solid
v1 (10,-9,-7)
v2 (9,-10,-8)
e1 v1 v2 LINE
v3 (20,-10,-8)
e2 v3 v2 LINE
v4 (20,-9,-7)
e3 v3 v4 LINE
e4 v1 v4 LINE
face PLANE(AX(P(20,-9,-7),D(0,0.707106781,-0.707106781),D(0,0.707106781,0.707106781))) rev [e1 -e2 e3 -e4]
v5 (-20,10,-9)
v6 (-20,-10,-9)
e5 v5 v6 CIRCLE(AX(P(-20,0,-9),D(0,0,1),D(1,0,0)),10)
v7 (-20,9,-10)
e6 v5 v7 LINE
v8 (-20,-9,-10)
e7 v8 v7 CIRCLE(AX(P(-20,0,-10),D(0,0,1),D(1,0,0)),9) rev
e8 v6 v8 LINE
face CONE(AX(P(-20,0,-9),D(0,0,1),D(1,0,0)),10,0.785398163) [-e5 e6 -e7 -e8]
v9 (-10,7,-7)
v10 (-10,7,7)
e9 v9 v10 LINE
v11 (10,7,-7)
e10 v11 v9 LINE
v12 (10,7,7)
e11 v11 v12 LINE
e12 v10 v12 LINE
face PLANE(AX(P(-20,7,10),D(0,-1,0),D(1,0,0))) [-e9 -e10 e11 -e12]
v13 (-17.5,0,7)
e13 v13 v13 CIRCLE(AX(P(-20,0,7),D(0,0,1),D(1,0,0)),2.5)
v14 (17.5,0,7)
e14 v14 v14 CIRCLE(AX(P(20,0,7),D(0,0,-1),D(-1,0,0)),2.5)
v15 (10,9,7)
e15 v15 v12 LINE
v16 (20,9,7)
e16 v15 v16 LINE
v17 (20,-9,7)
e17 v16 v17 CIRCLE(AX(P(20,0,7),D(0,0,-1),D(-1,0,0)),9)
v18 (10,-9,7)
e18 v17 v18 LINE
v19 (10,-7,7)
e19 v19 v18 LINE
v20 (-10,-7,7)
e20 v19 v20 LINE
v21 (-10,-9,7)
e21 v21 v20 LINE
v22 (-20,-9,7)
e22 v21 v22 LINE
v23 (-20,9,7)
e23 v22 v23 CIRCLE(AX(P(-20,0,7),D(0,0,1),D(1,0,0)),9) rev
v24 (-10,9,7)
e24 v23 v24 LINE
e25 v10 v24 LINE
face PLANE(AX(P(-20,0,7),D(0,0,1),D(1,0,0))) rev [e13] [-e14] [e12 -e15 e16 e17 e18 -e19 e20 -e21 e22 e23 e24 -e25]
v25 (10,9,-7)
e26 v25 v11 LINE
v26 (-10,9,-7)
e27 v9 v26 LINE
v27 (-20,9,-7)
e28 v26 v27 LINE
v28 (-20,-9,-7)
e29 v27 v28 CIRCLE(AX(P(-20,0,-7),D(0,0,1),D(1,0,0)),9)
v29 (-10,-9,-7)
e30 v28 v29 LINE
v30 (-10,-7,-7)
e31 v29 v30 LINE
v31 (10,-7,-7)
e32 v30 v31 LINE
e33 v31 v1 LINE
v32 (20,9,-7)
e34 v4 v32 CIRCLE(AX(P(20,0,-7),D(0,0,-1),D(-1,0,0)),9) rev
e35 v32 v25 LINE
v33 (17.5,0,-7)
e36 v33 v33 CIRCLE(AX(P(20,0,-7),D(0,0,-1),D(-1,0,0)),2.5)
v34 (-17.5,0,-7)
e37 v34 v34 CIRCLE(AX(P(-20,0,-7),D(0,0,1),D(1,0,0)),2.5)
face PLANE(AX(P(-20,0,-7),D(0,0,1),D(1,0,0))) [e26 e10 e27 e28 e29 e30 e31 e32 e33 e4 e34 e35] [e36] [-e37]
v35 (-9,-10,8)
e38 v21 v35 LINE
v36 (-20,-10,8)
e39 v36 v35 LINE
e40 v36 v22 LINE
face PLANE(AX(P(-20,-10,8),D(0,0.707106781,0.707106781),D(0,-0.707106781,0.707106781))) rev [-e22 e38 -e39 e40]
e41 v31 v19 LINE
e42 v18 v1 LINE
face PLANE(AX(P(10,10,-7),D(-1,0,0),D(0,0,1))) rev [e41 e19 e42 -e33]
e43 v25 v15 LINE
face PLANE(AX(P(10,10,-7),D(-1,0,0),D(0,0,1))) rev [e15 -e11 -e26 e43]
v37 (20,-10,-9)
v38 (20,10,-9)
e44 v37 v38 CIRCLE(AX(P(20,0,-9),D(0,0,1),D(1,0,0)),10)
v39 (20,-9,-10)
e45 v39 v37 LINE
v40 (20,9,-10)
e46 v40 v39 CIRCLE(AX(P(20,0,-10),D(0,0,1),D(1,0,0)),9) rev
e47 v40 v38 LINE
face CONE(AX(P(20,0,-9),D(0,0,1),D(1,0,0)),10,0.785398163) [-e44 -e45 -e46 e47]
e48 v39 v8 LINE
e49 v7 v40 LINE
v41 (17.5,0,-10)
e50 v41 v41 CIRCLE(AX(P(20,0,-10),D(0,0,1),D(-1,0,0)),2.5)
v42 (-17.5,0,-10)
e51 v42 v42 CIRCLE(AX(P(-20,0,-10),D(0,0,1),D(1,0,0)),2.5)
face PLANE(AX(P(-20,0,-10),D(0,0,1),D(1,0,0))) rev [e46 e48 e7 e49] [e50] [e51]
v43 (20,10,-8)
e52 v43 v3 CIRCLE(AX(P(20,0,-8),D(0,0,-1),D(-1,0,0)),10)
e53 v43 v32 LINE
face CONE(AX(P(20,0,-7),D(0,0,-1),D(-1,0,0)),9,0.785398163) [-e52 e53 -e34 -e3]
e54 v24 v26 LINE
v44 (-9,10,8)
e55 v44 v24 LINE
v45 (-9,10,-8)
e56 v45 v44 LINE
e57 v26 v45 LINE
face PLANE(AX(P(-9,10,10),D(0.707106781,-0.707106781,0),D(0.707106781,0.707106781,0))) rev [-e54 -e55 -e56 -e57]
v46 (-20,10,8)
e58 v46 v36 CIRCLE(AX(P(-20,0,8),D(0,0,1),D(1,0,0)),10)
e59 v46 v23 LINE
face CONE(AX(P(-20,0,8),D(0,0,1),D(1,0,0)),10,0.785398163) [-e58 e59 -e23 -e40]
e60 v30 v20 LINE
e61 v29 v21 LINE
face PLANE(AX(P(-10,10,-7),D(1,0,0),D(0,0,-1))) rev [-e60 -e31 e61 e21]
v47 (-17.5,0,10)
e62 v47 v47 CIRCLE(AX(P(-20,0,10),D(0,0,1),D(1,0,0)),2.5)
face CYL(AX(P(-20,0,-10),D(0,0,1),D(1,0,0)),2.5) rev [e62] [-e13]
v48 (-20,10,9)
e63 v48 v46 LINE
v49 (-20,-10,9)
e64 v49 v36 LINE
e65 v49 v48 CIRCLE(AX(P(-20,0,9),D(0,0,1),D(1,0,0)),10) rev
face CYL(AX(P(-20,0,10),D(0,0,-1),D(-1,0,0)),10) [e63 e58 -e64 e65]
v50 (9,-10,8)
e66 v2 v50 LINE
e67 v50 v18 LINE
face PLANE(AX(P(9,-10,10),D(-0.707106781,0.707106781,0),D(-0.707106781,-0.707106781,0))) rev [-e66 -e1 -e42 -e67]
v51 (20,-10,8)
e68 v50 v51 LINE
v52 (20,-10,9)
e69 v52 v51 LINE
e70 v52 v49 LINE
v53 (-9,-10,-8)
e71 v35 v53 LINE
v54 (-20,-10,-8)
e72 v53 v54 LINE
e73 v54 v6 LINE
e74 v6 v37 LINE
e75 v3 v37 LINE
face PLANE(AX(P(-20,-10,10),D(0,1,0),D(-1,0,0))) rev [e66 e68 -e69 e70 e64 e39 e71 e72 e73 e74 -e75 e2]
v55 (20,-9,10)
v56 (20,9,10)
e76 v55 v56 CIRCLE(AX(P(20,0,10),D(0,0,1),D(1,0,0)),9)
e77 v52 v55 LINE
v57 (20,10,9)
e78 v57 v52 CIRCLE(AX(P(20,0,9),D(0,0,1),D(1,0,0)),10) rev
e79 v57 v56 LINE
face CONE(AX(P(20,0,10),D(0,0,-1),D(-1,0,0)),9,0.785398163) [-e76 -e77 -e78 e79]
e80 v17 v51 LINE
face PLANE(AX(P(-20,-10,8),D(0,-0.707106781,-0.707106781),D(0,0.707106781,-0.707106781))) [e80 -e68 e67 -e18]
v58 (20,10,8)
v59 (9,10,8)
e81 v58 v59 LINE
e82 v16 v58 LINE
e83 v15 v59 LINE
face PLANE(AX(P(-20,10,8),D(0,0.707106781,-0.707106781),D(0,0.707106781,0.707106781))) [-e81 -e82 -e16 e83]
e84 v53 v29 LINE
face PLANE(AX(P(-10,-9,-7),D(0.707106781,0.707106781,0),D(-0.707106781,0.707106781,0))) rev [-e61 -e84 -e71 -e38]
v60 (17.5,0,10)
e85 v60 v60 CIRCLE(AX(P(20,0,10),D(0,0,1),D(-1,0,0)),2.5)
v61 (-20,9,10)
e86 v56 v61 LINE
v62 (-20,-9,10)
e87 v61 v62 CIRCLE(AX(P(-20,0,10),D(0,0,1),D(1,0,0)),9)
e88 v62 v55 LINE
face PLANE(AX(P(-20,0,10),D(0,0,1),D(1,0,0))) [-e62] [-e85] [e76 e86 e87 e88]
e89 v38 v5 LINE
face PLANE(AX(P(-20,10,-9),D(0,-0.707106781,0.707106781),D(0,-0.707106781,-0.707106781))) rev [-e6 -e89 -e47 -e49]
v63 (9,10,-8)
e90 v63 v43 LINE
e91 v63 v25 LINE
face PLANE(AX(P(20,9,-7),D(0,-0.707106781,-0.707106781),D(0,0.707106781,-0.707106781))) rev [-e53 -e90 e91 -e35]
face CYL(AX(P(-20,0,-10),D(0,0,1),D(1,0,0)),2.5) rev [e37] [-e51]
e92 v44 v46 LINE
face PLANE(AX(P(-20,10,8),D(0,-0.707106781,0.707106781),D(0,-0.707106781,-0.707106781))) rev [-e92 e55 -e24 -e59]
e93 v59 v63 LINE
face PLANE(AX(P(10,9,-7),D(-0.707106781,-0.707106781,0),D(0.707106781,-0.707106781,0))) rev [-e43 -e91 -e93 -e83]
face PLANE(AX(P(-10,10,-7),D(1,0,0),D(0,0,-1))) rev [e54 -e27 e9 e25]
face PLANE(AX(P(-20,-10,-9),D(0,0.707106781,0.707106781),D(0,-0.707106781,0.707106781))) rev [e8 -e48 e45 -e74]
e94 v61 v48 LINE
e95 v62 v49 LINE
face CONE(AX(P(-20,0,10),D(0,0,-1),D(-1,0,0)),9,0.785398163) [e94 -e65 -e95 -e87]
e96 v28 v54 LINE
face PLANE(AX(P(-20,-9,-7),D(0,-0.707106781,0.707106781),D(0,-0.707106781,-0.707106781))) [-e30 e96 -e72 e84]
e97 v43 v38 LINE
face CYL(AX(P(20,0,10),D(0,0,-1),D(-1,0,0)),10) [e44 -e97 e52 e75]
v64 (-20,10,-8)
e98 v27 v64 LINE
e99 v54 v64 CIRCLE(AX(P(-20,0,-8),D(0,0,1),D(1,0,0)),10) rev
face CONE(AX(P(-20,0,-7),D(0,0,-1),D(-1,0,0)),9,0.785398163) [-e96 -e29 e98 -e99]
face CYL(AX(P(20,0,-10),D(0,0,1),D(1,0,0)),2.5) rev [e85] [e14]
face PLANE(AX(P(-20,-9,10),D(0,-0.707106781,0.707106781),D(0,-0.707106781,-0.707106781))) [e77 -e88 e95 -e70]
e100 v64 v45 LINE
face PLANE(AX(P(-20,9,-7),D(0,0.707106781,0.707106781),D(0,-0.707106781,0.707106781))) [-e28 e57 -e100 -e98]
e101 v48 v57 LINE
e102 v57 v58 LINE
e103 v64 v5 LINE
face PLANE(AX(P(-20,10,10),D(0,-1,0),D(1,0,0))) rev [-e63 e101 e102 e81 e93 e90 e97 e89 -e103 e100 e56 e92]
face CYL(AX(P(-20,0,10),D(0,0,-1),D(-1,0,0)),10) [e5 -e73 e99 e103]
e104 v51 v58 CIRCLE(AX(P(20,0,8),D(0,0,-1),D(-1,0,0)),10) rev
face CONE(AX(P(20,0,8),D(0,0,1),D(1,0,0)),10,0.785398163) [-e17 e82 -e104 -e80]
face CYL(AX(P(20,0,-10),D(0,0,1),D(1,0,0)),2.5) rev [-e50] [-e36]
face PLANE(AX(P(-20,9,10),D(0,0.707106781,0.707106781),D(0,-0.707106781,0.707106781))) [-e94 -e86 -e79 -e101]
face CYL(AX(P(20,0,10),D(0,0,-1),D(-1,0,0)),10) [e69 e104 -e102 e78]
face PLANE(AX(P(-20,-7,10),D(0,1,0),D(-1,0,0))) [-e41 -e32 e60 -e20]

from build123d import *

# Parameters (mm, degrees)
BOSS_EXTRUDE1_DEPTH = 10
CUT_EXTRUDE1_DEPTH  = 7
SKETCH3_R           = 2.5
CUT_EXTRUDE2_DEPTH  = 10
CHAMFER2_SIZE       = 1
CHAMFER3_SIZE       = 1
SHELL1_START        = -7
SHELL1_OUTLINE_W    = 20
SHELL1_OUTLINE_H    = 14
SHELL1_DEPTH        = 14
CHAMFER4_SIZE       = 1


# Read off the part's stored shape, not the designer's step: Shell1
with BuildPart() as part:
    # Sketch1 → Boss-Extrude1 (new, symmetric)
    with BuildSketch(Plane.XY):
        with BuildLine():
            Line((-20, 10), (20, 10))
            ThreePointArc((20, 10), (30, 0), (20, -10))
            Line((20, -10), (-20, -10))
            ThreePointArc((-20, -10), (-30, 0), (-20, 10))
        make_face()
    extrude(amount=BOSS_EXTRUDE1_DEPTH, both=True)

    # Sketch2 → Cut-Extrude1 (cut, symmetric)
    with BuildSketch(Plane.XY):
        with BuildLine():
            Line((-20, 10), (-10, 10))
            Line((-10, 10), (-10, -10))
            Line((-10, -10), (-20, -10))
            ThreePointArc((-20, -10), (-30, 0), (-20, 10))
        make_face()
        with BuildLine():
            Line((10, -10), (20, -10))
            ThreePointArc((20, -10), (30, 0), (20, 10))
            Line((20, 10), (10, 10))
            Line((10, 10), (10, -10))
        make_face()
    extrude(amount=CUT_EXTRUDE1_DEPTH, both=True, mode=Mode.SUBTRACT)

    # Sketch3 → Cut-Extrude2 (cut, symmetric)
    with BuildSketch(Plane.XY):
        with Locations((-20, 0)):
            Circle(SKETCH3_R)
        with Locations(Location((20, 0, 0), (0, 0, 180))):
            Circle(SKETCH3_R)
    extrude(amount=CUT_EXTRUDE2_DEPTH, both=True, mode=Mode.SUBTRACT)

    # Chamfer2
    chamfer2_edges = [part.edges().sort_by_distance(p)[0] for p in [
        (-30, 0, -7),
        (-15, 10, -7),
        (-15, -10, -7),
        (-30, 0, 7),
        (-15, -10, 7),
        (-15, 10, 7),
        (30, 0, -7),
        (15, -10, -7),
        (15, 10, -7),
        (30, 0, 7),
        (15, 10, 7),
        (15, -10, 7),
    ]]
    chamfer(chamfer2_edges, length=CHAMFER2_SIZE)

    # Chamfer3
    chamfer3_edges = [part.edges().sort_by_distance(p)[0] for p in [
        (30, 0, 10),
        (0, 10, 10),
        (-30, 0, 10),
        (0, 10, -10),
        (30, 0, -10),
        (0, -10, -10),
        (-30, 0, -10),
        (0, -10, 10),
    ]]
    chamfer(chamfer3_edges, length=CHAMFER3_SIZE)

    # Shell1 outline → Shell1 (cut)
    with BuildSketch(Plane.XY.offset(SHELL1_START)):
        Rectangle(SHELL1_OUTLINE_W, SHELL1_OUTLINE_H)
    extrude(amount=SHELL1_DEPTH, mode=Mode.SUBTRACT)

    # Chamfer4
    chamfer4_edges = [part.edges().sort_by_distance(p)[0] for p in [
        (10, -10, 0),
        (10, 10, 0),
        (-10, -10, 0),
        (-10, 10, 0),
    ]]
    chamfer(chamfer4_edges, length=CHAMFER4_SIZE)


solid = part.part
